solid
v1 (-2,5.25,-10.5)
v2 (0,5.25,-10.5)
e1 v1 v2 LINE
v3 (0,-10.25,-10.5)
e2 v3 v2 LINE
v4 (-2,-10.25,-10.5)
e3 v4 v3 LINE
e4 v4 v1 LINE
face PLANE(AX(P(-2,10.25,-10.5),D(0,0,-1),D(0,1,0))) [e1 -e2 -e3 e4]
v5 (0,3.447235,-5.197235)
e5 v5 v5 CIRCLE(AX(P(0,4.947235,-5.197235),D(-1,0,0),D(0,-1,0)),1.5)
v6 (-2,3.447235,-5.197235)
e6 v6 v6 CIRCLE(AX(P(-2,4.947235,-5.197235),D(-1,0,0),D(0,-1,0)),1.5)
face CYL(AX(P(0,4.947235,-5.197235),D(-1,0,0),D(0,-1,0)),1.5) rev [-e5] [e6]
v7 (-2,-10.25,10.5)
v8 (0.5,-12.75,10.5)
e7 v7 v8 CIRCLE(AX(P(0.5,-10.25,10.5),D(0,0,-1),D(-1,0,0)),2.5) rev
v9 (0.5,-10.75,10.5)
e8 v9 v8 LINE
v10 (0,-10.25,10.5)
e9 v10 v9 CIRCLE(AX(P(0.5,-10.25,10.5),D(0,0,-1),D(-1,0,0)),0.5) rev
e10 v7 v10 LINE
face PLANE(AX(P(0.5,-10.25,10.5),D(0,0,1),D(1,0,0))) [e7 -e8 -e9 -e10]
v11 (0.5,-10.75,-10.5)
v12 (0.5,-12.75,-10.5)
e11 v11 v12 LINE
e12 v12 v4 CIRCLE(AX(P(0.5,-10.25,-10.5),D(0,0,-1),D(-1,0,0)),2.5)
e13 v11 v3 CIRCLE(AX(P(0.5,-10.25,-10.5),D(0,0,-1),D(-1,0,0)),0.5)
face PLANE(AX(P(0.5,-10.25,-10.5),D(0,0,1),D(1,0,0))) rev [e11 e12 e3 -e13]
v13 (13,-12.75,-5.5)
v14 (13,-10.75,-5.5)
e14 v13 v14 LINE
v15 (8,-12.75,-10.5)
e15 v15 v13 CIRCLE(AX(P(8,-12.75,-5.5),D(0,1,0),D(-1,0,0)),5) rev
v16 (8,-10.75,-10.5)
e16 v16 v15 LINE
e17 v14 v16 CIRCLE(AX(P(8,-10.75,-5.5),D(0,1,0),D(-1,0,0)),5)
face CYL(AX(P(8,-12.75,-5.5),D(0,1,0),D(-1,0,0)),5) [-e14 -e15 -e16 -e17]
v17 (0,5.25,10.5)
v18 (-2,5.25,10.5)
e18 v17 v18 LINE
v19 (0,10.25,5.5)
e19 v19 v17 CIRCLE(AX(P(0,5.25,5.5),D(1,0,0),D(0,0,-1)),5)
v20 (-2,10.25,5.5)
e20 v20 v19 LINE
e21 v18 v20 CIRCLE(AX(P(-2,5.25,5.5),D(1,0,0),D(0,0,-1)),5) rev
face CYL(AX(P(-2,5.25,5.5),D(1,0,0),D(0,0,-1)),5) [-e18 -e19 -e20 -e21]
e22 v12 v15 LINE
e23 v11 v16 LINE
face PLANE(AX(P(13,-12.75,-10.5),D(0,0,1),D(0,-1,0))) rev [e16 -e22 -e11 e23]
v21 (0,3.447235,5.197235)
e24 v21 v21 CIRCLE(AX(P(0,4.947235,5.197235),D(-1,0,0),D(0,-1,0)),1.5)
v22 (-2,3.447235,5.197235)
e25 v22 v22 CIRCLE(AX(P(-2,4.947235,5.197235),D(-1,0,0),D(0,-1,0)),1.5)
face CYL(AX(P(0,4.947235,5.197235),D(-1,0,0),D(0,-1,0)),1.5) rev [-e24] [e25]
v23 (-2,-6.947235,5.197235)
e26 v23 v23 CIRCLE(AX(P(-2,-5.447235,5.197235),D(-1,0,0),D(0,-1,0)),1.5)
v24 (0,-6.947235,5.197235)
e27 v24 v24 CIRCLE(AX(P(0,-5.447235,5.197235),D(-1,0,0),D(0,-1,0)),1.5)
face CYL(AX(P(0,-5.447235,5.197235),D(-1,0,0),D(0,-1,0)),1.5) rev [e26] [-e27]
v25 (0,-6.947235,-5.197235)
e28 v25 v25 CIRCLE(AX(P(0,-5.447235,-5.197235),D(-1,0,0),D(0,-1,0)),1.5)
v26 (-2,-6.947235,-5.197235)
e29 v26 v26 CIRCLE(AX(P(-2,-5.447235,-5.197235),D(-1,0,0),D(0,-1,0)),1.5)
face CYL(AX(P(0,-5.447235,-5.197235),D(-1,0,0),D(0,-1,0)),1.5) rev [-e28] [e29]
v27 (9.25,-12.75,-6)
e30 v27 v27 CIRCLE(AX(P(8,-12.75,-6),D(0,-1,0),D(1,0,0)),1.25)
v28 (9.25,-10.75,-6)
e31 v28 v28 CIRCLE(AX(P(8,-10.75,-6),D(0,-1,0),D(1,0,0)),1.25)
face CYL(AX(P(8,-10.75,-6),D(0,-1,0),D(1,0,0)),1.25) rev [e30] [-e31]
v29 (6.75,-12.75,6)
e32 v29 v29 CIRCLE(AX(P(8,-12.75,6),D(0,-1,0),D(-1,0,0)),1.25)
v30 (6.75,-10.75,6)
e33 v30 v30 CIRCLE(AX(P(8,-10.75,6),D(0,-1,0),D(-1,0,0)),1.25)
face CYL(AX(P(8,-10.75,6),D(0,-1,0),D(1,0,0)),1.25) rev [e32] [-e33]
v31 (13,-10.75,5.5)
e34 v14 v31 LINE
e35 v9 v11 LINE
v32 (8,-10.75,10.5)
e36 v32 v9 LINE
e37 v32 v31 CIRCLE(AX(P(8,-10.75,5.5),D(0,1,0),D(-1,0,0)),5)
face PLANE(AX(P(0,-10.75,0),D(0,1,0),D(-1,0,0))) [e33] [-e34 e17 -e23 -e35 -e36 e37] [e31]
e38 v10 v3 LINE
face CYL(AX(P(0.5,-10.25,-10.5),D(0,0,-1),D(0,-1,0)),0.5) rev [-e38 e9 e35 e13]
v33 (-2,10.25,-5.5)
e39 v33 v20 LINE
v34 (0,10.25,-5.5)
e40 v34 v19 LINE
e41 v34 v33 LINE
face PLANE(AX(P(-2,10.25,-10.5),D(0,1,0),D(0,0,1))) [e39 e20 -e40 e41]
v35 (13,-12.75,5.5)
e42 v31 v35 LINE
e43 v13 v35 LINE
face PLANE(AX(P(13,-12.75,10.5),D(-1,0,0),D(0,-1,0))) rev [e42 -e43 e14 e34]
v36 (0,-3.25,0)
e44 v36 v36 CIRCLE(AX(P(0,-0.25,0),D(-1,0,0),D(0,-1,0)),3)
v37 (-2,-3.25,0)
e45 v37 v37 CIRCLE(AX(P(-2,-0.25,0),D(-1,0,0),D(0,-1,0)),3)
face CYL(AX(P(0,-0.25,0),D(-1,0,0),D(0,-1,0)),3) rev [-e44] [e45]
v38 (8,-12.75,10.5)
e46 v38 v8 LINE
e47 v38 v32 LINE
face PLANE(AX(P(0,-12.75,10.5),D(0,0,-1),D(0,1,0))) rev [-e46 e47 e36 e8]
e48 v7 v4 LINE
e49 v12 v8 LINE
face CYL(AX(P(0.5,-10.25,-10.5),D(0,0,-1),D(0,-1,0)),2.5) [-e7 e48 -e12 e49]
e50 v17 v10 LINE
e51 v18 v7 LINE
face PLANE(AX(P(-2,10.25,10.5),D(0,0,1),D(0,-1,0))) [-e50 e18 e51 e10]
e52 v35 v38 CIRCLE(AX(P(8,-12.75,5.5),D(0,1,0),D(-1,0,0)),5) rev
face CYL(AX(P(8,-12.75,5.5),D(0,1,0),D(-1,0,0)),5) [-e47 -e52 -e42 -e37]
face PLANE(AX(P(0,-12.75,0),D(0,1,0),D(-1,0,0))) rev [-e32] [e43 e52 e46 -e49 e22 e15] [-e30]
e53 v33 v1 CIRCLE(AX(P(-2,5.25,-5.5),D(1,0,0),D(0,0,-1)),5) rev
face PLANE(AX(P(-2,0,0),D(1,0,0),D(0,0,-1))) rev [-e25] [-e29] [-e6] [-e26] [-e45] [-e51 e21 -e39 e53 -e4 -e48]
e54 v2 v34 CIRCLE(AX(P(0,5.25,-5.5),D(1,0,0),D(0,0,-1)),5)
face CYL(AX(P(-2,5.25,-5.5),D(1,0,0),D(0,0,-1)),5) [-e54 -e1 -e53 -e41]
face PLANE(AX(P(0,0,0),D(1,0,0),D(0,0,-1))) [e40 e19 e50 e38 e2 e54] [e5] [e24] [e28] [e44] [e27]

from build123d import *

# Parameters (mm, degrees)
CROQUIS_BASE_W         = 20.5
CROQUIS_BASE_H         = 21
BRIDA_BASE1_DEPTH      = 2
BRIDA_DE_ARISTA1_DEPTH = 21
CROQUIS11_R            = 3
CROQUIS11_R_2          = 1.5
CORTAR_EXTRUIR1_DEPTH  = 10
CROQUIS12_R            = 1.25
CORTAR_EXTRUIR2_DEPTH  = 2
REDONDEO1_R            = 5


# Sheet-metal steps are written as plain solids
with BuildPart() as part:
    # Croquis base → Brida base1 (new body)
    with BuildSketch(Plane(origin=(0, 0, 0), x_dir=(0, -1, 0), z_dir=(1, 0, 0))):
        Rectangle(CROQUIS_BASE_W, CROQUIS_BASE_H)
    extrude(amount=-BRIDA_BASE1_DEPTH)

    # Brida de arista1 section (across the edge) → Brida de arista1 (add)
    with BuildSketch(Plane(origin=(0, -10.75, 10.5), x_dir=(0, 1, 0), z_dir=(0, 0, -1))):
        with BuildLine():
            Line((-2, 0.5), (-2, 13))
            Line((-2, 13), (0, 13))
            Line((0, 13), (0, 0.5))
            ThreePointArc((0, 0.5), (0.146446609, 0.146446609), (0.5, 0))
            Line((0.5, 0), (0.5, -2))
            ThreePointArc((0.5, -2), (-1.267766953, -1.267766953), (-2, 0.5))
        make_face()
    extrude(amount=BRIDA_DE_ARISTA1_DEPTH)

    # Croquis11 → Cortar-Extruir1 (cut)
    with BuildSketch(Plane(origin=(-2, 0, 0), x_dir=(0, -1, 0), z_dir=(-1, 0, 0))):
        with Locations((0.25, 0)):
            Circle(CROQUIS11_R)
        with Locations((-4.947234842, 5.197234842)):
            Circle(CROQUIS11_R_2)
        with Locations((5.447234842, 5.197234842)):
            Circle(CROQUIS11_R_2)
        with Locations((5.447234842, -5.197234842)):
            Circle(CROQUIS11_R_2)
        with Locations((-4.947234842, -5.197234842)):
            Circle(CROQUIS11_R_2)
    extrude(amount=-CORTAR_EXTRUIR1_DEPTH, mode=Mode.SUBTRACT)

    # Croquis12 → Cortar-Extruir2 (cut)
    with BuildSketch(Plane(origin=(0, -12.75, 0), x_dir=(0, 0, -1), z_dir=(0, -1, 0))):
        with Locations(Location((6, 8, 0), (0, 0, 90))):
            Circle(CROQUIS12_R)
        with Locations(Location((-6, 8, 0), (0, 0, 270))):
            Circle(CROQUIS12_R)
    extrude(amount=-CORTAR_EXTRUIR2_DEPTH, mode=Mode.SUBTRACT)

    # Redondeo1
    redondeo1_edges = [part.edges().sort_by_distance(p)[0] for p in [
        (13, -11.75, 10.5),
        (13, -11.75, -10.5),
        (-1, 10.25, 10.5),
        (-1, 10.25, -10.5),
    ]]
    fillet(redondeo1_edges, radius=REDONDEO1_R)


solid = part.part
